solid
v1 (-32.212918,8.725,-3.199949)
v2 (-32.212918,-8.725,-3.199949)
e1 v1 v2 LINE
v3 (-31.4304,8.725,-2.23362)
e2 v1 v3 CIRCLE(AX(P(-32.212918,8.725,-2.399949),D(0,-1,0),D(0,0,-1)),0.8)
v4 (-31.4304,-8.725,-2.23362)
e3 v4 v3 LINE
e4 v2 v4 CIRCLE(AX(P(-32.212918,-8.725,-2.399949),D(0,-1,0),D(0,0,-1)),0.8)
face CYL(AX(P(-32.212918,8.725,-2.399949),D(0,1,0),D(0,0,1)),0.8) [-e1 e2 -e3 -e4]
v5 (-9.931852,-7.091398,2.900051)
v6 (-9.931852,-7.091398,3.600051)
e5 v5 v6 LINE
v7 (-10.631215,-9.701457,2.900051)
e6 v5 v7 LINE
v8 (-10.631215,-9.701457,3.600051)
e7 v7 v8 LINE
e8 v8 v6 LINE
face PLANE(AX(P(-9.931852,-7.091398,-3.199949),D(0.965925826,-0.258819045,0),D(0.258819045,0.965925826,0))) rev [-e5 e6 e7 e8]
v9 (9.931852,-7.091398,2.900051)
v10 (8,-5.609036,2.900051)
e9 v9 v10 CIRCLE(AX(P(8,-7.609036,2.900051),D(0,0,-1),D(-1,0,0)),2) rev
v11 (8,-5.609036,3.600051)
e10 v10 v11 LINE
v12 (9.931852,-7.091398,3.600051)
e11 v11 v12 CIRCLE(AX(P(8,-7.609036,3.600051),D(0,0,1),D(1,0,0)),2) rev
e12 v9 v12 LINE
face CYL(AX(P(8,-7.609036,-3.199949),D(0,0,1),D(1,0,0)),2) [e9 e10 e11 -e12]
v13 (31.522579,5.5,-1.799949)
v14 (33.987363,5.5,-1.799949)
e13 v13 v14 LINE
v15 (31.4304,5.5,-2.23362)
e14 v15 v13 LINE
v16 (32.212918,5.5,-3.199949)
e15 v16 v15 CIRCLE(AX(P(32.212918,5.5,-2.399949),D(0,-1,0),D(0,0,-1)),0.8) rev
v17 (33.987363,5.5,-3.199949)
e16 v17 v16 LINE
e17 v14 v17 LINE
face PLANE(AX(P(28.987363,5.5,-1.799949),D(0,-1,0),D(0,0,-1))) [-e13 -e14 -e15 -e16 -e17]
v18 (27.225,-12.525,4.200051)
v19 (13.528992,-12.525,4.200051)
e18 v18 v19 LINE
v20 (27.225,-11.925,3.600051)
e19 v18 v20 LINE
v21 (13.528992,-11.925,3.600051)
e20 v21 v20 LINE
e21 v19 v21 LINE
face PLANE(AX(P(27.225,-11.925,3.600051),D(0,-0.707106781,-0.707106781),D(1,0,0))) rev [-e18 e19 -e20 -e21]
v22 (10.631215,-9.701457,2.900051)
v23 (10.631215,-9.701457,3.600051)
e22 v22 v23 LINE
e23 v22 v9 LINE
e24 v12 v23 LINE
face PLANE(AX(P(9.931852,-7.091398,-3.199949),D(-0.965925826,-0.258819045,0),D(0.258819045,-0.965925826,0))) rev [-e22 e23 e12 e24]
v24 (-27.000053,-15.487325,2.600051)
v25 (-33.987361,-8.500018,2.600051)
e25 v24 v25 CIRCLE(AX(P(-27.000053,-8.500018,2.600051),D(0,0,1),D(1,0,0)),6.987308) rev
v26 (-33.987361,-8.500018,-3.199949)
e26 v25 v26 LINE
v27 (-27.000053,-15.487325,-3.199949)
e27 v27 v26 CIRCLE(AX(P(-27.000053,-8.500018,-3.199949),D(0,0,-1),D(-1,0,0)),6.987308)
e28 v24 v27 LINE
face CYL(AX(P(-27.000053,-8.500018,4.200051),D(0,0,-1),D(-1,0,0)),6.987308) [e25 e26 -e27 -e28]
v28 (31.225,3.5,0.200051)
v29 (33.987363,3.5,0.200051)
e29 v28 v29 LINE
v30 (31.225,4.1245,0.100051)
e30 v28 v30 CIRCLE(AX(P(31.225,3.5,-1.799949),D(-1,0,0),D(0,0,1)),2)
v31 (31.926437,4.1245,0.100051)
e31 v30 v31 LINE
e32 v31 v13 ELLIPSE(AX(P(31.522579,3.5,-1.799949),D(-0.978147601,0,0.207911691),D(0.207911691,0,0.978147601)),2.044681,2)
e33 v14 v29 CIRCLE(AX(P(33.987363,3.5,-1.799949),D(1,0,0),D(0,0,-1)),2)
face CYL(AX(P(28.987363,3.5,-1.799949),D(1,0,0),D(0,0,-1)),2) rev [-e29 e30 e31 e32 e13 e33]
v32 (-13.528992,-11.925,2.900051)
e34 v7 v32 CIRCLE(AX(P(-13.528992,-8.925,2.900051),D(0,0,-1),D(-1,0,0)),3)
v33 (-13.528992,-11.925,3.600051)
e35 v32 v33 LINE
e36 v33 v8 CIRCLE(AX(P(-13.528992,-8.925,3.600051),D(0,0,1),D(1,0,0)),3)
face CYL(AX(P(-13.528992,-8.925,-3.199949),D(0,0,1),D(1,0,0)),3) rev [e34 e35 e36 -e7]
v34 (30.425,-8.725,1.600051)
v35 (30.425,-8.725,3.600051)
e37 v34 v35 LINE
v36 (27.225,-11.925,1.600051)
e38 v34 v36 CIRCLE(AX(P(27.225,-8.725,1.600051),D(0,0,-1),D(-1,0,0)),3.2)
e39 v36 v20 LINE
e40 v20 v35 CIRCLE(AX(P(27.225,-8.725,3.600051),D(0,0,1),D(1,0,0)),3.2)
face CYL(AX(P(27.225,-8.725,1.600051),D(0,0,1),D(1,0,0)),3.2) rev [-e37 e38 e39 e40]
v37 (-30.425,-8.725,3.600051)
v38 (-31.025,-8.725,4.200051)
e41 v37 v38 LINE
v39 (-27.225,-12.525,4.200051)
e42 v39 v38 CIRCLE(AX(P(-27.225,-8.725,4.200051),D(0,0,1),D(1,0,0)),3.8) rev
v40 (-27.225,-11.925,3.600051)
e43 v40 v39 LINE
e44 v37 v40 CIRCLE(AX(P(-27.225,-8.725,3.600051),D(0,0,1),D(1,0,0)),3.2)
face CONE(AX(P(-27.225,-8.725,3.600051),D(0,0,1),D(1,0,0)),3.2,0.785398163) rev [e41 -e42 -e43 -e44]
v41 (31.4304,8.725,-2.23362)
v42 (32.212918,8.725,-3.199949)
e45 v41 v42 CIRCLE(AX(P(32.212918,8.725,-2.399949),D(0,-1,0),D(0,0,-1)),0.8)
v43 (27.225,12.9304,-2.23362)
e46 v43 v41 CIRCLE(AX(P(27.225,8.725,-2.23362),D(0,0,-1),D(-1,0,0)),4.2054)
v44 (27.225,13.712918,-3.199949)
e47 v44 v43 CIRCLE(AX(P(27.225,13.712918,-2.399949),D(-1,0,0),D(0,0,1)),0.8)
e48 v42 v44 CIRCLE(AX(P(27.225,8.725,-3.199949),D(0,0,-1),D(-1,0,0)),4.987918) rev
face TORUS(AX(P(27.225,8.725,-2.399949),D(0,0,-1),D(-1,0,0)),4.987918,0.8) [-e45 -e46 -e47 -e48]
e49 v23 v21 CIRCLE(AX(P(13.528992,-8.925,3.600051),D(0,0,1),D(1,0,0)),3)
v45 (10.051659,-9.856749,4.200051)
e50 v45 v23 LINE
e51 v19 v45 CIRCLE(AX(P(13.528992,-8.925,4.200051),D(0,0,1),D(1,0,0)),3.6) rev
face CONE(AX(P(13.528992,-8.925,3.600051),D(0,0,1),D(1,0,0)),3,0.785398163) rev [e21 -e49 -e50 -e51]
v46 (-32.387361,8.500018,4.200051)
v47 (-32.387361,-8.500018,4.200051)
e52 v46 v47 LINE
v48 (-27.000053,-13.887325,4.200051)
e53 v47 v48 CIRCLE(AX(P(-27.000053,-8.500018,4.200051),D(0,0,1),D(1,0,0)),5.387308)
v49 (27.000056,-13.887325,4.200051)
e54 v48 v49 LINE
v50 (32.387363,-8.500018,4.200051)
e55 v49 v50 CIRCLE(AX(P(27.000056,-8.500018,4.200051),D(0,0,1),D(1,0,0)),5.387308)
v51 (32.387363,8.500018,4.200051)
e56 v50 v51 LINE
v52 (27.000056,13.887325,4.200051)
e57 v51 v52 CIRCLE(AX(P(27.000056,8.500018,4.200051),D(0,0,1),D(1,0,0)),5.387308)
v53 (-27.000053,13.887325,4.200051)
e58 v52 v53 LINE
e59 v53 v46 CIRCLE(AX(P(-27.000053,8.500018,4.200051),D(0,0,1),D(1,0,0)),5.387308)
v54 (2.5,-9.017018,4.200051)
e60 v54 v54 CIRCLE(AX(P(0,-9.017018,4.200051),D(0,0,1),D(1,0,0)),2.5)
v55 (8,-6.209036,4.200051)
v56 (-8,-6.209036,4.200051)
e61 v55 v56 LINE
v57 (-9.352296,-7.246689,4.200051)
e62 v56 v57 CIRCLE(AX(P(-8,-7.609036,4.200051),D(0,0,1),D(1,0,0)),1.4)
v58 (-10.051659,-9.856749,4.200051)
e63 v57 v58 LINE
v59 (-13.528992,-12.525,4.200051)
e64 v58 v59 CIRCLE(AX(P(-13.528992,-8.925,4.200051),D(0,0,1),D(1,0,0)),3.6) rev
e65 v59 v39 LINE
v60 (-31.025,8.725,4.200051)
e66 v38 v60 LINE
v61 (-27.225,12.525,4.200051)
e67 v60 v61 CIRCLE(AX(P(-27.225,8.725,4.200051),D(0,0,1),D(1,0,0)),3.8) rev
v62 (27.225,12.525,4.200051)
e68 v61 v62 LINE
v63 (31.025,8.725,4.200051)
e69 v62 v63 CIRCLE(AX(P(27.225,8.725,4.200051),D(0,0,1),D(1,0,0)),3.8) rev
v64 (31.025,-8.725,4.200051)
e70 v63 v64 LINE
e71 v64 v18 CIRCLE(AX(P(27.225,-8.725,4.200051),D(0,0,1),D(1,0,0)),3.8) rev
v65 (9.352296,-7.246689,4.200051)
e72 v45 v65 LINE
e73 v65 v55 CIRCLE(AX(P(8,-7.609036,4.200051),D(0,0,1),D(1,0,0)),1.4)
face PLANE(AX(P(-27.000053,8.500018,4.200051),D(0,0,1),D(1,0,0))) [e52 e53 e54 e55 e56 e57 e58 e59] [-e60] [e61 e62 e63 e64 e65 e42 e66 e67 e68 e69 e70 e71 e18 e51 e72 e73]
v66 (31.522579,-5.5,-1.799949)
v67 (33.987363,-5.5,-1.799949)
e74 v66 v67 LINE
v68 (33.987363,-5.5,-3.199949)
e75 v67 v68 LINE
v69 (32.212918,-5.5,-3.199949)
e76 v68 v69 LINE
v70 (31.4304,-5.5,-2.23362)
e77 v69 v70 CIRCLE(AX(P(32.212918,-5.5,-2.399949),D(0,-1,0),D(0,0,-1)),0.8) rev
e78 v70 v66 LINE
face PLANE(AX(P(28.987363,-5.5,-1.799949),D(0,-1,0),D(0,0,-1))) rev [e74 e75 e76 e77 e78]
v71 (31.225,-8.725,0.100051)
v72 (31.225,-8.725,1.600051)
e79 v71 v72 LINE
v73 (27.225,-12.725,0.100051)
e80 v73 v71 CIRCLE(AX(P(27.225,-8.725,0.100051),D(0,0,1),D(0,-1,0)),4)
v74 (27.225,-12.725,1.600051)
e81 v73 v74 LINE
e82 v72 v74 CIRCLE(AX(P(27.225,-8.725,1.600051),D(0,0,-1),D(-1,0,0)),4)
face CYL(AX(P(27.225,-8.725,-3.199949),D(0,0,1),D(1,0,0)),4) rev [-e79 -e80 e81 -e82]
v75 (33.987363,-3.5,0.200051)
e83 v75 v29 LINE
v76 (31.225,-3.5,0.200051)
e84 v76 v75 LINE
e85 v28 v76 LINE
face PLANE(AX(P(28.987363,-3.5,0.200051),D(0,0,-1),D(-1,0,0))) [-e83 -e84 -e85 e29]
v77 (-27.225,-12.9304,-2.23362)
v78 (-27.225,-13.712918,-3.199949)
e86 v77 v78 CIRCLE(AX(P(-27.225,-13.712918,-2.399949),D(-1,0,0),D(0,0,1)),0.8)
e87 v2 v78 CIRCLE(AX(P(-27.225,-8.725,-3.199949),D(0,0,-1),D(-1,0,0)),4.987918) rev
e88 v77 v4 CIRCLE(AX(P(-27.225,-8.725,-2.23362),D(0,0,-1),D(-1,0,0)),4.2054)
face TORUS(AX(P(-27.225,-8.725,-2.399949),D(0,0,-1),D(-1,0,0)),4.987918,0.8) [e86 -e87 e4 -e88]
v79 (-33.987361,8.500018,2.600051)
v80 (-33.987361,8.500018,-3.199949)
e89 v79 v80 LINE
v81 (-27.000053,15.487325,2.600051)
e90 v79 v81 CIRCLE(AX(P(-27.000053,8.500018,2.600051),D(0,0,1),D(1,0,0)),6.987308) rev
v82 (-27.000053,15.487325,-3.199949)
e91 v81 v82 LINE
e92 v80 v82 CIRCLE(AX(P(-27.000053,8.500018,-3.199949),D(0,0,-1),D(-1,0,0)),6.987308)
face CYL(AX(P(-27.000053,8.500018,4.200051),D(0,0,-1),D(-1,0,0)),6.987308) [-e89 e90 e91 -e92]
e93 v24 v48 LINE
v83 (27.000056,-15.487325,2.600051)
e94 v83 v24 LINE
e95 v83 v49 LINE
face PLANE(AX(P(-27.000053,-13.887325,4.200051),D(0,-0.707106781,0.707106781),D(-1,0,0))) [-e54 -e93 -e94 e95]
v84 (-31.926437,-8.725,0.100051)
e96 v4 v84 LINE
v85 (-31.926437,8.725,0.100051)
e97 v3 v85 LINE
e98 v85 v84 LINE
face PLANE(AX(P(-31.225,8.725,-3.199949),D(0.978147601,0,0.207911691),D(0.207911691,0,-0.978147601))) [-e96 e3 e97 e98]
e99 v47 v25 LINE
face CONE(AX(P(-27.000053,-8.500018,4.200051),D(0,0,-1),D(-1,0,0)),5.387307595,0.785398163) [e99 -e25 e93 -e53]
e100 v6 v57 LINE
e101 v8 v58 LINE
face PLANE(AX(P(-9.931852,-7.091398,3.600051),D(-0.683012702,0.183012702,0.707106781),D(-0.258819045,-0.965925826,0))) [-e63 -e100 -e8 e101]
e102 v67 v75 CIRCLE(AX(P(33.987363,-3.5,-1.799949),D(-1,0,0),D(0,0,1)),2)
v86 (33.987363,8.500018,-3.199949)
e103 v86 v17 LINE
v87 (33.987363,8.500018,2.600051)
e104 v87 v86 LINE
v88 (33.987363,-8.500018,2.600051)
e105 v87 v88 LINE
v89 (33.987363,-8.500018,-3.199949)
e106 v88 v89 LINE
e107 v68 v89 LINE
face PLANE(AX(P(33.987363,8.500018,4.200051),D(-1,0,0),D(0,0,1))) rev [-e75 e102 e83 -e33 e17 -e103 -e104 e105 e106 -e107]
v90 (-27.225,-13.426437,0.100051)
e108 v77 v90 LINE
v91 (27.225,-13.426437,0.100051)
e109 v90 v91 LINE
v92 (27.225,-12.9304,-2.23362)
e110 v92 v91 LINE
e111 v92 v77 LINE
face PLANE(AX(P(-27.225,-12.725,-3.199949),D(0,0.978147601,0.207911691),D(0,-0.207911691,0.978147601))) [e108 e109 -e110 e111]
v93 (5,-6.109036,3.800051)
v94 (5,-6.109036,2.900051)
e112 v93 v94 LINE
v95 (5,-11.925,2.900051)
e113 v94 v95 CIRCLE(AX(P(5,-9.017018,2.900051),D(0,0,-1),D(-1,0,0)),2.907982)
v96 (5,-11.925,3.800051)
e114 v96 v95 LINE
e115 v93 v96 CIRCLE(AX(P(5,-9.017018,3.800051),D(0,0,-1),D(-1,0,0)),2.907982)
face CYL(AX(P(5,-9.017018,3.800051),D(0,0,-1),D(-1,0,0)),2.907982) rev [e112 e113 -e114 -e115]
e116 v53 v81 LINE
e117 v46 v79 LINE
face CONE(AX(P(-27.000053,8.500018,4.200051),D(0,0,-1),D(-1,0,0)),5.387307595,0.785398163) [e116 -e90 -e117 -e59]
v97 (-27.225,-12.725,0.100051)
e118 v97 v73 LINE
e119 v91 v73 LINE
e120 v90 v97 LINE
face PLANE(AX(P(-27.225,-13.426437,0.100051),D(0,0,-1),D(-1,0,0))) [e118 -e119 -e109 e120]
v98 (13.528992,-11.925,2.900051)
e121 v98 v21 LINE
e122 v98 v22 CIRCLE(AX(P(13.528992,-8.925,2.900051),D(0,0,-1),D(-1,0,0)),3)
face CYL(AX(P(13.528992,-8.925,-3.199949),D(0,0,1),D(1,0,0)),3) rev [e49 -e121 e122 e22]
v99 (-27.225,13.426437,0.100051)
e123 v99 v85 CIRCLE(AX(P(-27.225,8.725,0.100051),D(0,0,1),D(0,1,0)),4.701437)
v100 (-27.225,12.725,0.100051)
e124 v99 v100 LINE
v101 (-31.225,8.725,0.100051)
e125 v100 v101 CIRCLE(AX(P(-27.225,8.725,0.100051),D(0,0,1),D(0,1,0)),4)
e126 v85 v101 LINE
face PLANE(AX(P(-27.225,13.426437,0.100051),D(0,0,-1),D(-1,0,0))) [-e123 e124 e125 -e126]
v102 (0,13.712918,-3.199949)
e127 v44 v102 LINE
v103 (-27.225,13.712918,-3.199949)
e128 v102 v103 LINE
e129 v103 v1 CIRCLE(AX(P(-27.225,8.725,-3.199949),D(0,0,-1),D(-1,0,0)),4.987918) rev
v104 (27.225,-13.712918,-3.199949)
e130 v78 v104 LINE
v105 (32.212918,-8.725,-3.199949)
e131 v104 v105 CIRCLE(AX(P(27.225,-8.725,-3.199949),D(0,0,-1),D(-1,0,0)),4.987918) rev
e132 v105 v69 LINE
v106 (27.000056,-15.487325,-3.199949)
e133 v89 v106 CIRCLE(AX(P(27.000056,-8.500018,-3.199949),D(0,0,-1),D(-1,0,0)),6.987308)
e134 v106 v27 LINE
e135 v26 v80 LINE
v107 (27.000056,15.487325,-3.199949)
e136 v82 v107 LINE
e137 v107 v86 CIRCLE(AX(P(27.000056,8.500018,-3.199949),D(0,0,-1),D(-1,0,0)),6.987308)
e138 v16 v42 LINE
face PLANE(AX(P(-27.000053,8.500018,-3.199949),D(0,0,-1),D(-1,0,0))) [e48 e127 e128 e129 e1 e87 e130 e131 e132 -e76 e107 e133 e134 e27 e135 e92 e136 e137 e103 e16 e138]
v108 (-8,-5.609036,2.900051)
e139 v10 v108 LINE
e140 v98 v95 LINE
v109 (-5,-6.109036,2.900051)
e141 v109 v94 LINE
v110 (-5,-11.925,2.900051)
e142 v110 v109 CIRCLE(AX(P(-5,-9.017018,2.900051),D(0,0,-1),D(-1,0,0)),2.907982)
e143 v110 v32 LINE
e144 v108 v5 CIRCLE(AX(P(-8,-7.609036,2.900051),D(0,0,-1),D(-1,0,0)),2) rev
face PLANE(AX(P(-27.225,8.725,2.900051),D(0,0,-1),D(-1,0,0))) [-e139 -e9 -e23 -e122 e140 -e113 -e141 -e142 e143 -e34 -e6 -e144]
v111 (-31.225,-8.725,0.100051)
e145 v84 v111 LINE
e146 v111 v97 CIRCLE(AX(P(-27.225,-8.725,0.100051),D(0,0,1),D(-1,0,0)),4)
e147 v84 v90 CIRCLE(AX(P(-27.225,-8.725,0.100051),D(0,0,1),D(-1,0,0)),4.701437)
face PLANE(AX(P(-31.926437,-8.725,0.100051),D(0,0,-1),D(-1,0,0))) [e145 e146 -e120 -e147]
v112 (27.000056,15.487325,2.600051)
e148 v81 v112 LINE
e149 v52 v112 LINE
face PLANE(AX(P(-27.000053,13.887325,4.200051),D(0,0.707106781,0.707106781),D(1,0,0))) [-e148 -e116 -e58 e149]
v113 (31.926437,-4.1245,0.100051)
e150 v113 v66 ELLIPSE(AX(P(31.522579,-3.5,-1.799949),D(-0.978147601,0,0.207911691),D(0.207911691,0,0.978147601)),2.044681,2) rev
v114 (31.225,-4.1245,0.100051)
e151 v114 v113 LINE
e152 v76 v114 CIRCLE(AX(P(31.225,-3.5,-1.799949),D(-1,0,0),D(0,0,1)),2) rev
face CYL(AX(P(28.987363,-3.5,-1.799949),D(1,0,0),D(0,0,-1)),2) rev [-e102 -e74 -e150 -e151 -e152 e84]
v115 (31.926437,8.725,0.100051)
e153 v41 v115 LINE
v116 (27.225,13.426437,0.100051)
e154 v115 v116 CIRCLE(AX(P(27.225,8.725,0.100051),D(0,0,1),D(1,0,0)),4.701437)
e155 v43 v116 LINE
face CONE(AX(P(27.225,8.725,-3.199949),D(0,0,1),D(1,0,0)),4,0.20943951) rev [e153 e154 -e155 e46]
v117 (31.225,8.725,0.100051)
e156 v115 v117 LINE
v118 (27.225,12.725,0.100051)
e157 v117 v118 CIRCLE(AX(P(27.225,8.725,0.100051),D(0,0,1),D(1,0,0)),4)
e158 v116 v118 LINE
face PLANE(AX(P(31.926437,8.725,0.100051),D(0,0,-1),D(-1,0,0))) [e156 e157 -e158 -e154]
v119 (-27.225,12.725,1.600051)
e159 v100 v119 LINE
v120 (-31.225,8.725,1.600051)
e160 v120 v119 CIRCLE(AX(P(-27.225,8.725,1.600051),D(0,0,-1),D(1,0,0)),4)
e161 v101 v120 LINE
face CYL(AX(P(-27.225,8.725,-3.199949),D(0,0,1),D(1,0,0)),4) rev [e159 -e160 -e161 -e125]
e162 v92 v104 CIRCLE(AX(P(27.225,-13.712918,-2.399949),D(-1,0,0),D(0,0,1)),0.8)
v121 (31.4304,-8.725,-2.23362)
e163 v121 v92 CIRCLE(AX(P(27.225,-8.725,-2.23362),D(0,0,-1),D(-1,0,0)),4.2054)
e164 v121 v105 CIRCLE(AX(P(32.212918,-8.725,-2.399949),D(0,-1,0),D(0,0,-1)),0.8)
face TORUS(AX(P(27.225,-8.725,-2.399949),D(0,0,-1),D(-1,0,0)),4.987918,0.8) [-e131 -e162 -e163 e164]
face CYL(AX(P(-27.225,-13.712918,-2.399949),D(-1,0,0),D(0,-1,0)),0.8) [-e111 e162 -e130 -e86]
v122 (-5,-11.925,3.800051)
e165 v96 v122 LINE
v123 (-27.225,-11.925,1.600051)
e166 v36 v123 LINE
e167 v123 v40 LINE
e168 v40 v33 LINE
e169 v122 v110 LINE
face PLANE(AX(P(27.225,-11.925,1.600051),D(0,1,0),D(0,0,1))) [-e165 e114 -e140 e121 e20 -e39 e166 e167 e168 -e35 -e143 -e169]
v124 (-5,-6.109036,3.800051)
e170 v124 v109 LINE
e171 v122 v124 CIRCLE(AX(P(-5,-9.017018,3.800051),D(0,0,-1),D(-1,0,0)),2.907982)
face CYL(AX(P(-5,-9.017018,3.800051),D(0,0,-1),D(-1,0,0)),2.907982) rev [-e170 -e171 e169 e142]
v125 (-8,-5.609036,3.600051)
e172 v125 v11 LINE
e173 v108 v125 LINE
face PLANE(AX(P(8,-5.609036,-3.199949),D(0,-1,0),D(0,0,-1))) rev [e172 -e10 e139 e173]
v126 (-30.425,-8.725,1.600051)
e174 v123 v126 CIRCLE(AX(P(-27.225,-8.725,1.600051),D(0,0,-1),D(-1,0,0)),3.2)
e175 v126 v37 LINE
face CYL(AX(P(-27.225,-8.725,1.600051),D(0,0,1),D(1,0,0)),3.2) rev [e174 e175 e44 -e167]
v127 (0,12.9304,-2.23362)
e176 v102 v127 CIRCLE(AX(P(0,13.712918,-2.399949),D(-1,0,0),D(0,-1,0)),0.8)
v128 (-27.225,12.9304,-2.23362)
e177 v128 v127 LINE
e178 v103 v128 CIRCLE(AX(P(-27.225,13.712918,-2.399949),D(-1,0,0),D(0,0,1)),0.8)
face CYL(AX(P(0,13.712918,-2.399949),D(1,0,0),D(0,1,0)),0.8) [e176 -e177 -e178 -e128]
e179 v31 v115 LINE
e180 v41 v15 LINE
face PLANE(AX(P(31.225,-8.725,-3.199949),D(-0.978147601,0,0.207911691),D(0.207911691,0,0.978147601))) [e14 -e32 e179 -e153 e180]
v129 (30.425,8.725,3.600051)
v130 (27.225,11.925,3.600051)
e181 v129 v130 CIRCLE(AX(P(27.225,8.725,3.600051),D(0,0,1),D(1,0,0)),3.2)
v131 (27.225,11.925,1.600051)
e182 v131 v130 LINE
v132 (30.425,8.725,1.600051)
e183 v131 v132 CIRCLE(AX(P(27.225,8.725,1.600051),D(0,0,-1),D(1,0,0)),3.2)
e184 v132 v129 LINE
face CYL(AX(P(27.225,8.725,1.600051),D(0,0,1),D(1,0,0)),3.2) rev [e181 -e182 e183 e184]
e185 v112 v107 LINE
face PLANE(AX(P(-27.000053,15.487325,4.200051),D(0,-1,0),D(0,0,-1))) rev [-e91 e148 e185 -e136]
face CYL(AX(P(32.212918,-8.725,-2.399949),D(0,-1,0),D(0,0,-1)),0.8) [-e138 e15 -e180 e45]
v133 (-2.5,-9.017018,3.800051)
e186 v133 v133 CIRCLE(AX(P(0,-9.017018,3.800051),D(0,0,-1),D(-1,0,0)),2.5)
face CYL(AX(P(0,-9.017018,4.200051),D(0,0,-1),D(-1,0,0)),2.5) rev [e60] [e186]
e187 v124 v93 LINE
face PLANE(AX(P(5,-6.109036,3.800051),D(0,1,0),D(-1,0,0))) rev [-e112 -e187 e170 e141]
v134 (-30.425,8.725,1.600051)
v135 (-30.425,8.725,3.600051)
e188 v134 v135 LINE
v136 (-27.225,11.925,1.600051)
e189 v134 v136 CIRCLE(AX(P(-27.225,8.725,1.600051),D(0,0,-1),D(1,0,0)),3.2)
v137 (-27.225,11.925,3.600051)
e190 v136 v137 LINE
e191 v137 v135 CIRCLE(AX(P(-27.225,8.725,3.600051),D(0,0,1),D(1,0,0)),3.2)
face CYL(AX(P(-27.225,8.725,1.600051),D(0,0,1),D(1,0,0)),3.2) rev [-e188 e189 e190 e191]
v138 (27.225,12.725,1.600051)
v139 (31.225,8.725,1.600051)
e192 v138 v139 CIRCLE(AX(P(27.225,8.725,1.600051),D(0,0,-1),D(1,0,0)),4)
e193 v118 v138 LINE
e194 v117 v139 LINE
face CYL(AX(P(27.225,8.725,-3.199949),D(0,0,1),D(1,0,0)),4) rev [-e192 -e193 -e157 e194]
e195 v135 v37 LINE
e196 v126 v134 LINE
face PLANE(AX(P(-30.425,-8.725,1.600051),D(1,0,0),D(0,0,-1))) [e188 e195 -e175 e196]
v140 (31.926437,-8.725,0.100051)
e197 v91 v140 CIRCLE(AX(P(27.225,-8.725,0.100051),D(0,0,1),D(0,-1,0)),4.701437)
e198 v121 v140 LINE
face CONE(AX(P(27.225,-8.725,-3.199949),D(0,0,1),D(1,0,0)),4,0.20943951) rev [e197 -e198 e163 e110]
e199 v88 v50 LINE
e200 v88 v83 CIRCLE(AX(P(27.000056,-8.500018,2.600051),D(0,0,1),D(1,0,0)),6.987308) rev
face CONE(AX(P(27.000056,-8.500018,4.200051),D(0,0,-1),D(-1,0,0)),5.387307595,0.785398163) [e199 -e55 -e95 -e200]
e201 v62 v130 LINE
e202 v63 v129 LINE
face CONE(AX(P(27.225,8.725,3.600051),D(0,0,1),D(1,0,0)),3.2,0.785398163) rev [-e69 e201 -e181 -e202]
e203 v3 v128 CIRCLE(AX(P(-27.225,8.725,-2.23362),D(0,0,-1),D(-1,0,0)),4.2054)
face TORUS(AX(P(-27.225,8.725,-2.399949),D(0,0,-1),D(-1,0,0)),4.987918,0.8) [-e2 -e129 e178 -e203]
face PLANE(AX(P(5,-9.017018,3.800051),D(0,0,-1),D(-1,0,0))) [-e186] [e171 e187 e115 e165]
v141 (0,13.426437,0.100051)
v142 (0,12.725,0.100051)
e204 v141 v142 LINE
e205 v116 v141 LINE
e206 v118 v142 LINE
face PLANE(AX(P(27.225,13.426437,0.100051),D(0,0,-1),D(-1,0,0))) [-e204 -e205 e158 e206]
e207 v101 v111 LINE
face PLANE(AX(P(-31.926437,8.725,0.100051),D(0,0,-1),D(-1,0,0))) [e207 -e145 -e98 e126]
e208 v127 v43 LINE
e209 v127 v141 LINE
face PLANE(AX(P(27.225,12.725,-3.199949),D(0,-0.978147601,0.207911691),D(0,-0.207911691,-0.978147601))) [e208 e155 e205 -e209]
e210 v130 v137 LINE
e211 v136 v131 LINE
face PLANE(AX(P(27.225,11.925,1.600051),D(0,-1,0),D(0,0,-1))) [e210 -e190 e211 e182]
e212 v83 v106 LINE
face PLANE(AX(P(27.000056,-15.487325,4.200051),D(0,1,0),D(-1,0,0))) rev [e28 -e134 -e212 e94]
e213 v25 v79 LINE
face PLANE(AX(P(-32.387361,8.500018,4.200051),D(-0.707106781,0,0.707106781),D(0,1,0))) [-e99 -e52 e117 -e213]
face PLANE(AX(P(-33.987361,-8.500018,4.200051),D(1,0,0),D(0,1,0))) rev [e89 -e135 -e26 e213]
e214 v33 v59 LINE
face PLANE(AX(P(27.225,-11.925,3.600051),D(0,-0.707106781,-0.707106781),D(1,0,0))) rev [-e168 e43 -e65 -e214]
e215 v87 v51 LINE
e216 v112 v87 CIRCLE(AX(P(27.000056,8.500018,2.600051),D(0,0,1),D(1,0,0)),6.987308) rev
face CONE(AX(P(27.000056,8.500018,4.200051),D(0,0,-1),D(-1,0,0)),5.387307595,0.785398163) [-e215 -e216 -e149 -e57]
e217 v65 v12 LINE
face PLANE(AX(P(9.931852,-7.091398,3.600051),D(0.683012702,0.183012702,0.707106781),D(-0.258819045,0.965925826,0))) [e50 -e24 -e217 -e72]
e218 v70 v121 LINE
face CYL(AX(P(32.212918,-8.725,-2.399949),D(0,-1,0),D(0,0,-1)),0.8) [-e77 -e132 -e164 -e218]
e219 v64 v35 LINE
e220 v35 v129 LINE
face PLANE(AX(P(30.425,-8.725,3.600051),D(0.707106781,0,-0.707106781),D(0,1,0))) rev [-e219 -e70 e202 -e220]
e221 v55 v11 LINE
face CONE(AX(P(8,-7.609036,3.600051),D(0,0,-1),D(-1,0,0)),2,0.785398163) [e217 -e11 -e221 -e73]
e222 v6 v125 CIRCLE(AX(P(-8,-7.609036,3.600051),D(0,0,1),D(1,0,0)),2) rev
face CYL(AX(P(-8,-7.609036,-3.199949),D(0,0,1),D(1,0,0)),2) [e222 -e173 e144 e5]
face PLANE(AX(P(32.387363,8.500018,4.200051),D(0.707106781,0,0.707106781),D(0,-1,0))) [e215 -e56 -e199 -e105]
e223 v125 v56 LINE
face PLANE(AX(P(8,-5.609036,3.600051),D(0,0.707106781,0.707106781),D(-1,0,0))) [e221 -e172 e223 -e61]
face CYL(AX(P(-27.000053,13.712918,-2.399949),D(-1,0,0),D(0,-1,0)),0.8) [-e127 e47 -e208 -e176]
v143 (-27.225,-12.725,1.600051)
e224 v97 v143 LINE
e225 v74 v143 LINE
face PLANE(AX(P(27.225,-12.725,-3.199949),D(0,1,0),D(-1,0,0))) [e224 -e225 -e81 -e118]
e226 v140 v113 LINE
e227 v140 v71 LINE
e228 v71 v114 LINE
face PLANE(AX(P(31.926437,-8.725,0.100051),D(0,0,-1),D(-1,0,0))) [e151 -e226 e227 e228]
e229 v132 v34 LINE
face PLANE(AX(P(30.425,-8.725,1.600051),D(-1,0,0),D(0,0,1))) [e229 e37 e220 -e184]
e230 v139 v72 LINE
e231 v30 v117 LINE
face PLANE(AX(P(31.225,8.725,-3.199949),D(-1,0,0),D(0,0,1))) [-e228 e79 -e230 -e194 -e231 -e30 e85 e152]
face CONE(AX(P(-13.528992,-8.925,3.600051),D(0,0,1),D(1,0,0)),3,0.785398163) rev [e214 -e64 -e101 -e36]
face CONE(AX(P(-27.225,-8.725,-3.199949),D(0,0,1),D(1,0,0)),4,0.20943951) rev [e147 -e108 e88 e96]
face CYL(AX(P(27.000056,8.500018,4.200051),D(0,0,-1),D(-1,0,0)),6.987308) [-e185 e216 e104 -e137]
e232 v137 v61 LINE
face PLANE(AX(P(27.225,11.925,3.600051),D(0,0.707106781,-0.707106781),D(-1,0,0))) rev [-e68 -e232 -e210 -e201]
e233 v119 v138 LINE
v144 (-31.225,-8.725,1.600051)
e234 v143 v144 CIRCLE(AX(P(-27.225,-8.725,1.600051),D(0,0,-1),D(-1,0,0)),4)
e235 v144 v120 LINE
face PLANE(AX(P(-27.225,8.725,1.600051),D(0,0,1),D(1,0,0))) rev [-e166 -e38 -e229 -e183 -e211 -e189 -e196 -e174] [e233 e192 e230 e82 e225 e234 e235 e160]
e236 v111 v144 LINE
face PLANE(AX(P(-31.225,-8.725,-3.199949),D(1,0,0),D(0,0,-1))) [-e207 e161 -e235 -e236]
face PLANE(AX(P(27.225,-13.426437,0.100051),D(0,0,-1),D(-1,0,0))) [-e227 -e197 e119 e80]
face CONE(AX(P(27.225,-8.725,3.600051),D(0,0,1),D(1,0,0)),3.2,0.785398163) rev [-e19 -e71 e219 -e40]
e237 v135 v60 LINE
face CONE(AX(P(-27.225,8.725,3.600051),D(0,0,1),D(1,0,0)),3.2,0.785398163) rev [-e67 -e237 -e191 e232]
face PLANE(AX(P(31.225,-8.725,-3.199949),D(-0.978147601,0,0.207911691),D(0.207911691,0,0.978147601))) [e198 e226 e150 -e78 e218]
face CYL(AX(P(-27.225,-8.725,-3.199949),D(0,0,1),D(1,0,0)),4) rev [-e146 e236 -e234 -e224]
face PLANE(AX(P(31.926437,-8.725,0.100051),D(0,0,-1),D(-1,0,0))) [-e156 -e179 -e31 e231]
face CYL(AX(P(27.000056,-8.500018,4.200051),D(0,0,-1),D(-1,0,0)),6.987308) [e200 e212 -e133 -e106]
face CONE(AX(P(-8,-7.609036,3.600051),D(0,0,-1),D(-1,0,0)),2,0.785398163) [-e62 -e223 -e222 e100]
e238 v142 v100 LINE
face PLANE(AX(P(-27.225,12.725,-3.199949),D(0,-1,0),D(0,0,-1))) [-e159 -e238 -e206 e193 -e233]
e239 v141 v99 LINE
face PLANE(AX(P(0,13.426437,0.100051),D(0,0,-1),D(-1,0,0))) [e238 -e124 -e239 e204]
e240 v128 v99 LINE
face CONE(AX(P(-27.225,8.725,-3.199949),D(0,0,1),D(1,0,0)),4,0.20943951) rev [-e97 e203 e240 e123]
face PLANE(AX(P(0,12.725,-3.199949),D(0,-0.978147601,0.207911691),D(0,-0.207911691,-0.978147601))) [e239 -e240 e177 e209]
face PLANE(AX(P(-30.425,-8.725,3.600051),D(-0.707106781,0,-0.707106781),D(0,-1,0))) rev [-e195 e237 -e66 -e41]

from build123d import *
from build123d.topology import SkipClean

# Parameters (mm, degrees)
SKIZZE1_W                         = 7.626009652
SKIZZE1_H                         = 10.039014478
AUFSATZ_LINEAR_AUSTRAGEN1_DEPTH   = 1.5
AUFSATZ_LINEAR_AUSTRAGEN1_2_DEPTH = 1.5
AUFSATZ_LINEAR_AUSTRAGEN1_3_DEPTH = 1.5
AUFSATZ_LINEAR_AUSTRAGEN1_4_DEPTH = 1.5
AUFSATZ_LINEAR_AUSTRAGEN1_5_DEPTH = 1.5
SKIZZE2_R                         = 2.5
AUFSATZ_LINEAR_AUSTRAGEN2_DEPTH   = 0.4
AUFSATZ_LINEAR_AUSTRAGEN3_DEPTH   = 2.2
AUFSATZ_LINEAR_AUSTRAGEN14_DEPTH  = 7
SKIZZE14_R                        = 2.5
SKIZZE14_W                        = 7.626009652
SKIZZE14_H                        = 10.039014478
AUFSATZ_LINEAR_AUSTRAGEN15_DEPTH  = 0.9
VERRUNDUNG1_R                     = 0.8
SCHNITT_LINEAR_AUSTRAGEN1_DEPTH   = 5
SCHNITT_LINEAR_AUSTRAGEN2_DEPTH   = 0.9
FASE1_SIZE                        = 1.6
SCHNITT_LINEAR_AUSTRAGEN4_DEPTH   = 39.075689459
FASE2_SIZE                        = 0.6


with BuildPart() as part:
    # Skizze1 → Aufsatz-Linear austragen1 (new body)
    with BuildSketch(Plane.XY.offset(2.3000508)):
        with Locations((-8.282016764, -0.163000133)):
            Rectangle(SKIZZE1_W, SKIZZE1_H)
        Polygon((-11.69502159, 4.456507106), (-5.069011938, 4.456507106), (-5.069011938, -4.582507372), (-9.09502159, -4.582507372), (-11.69502159, -4.124057223), (-11.69502159, 0.203832093), (-9.09502159, 0.900499994), (-7.35501651, 0.900499994), (-7.35501651, -0.899500006), (-9.89502159, -0.899500006), (-9.89502159, -2.782507372), (-6.869011938, -2.782507372), (-6.869011938, 2.656507106), (-11.69502159, 2.656507106), align=None, mode=Mode.SUBTRACT)
    extrude(amount=AUFSATZ_LINEAR_AUSTRAGEN1_DEPTH)



with BuildPart() as body_2:
    # Skizze1 → Aufsatz-Linear austragen1 2 (new body)
    with BuildSketch(Plane.XY.offset(2.3000508)):
        Polygon((-15.915075673, 4.956507106), (-28.451054102, 4.956507106), (-28.451054102, -5.082507372), (-25.651054102, -5.082507372), (-25.651054102, 2.156507106), (-22.99004318, 2.156507106), (-22.99004318, -5.082507372), (-20.19004318, -5.082507372), (-20.19004318, 2.156507106), (-17.91003302, 2.156507106), (-17.91003302, -5.082507372), (-15.11003302, -5.082507372), (-15.11003302, 2.744670596), align=None)
        Polygon((-27.951054102, -4.582507372), (-26.151054102, -4.582507372), (-26.151054102, 2.656507106), (-22.49004318, 2.656507106), (-22.49004318, -4.582507372), (-20.69004318, -4.582507372), (-20.69004318, 2.656507106), (-17.41003302, 2.656507106), (-17.41003302, -4.582507372), (-15.61003302, -4.582507372), (-15.61003302, 2.656507106), (-16.265179442, 4.456507106), (-27.951054102, 4.456507106), align=None, mode=Mode.SUBTRACT)
    extrude(amount=AUFSATZ_LINEAR_AUSTRAGEN1_2_DEPTH)


with BuildPart() as body_3:
    # Skizze1 → Aufsatz-Linear austragen1 3 (new body)
    with BuildSketch(Plane.XY.offset(2.3000508)):
        Polygon((5.972009144, 4.956507106), (3.559004318, 4.956507106), (3.559004318, 8.89351498), (0.759004318, 8.89351498), (0.759004318, 4.956507106), (-1.654000508, 4.956507106), (-1.654000508, 2.156507106), (0.759004318, 2.156507106), (0.759004318, -5.082507372), (5.972009144, -5.082507372), (5.972009144, -2.282507372), (3.559004318, -2.282507372), (3.559004318, 2.156507106), (5.972009144, 2.156507106), align=None)
        Polygon((1.259004318, 8.39351498), (1.259004318, 4.456507106), (-1.154000508, 4.456507106), (-1.154000508, 2.656507106), (1.259004318, 2.656507106), (1.259004318, -4.582507372), (5.472009144, -4.582507372), (5.472009144, -2.782507372), (3.059004318, -2.782507372), (3.059004318, 2.656507106), (5.472009144, 2.656507106), (5.472009144, 4.456507106), (3.059004318, 4.456507106), (3.059004318, 8.39351498), align=None, mode=Mode.SUBTRACT)
    extrude(amount=AUFSATZ_LINEAR_AUSTRAGEN1_3_DEPTH)


with BuildPart() as body_4:
    # Skizze1 → Aufsatz-Linear austragen1 4 (new body)
    with BuildSketch(Plane.XY.offset(2.3000508)):
        Polygon((10.972977453, 4.956507106), (16.513030226, 4.956507106), (16.513030226, 2.156507106), (12.264129895, 2.156507106), (11.687020574, 1.579397784), (11.687020574, -1.705398051), (12.264129895, -2.282507372), (16.513030226, -2.282507372), (16.513030226, -5.082507372), (10.972977453, -5.082507372), (8.887020574, -3.332181725), (8.887020574, 3.206181458), align=None)
        Polygon((16.013030226, 2.656507106), (12.057023114, 2.656507106), (11.187020574, 1.786504566), (11.187020574, -1.912504832), (12.057023114, -2.782507372), (16.013030226, -2.782507372), (16.013030226, -4.582507372), (11.15496257, -4.582507372), (9.387020574, -3.099027896), (9.387020574, 2.973027629), (11.15496257, 4.456507106), (16.013030226, 4.456507106), align=None, mode=Mode.SUBTRACT)
    extrude(amount=AUFSATZ_LINEAR_AUSTRAGEN1_4_DEPTH)


with BuildPart() as body_5:
    # Skizze1 → Aufsatz-Linear austragen1 5 (new body)
    with BuildSketch(Plane.XY.offset(2.3000508)):
        Polygon((27.321990188, 4.856507106), (22.128041656, 4.856507106), (22.128041656, 8.666514726), (19.528041656, 8.666514726), (19.528041656, -4.982507372), (22.128041656, -4.982507372), (22.128041656, 2.256507106), (25.497053594, 2.256507106), (25.497053594, -4.982507372), (28.097053594, -4.982507372), (28.097053594, 2.727037898), align=None)
        Polygon((19.928041656, 8.266514726), (19.928041656, -4.582507372), (21.728041656, -4.582507372), (21.728041656, 2.656507106), (25.897053594, 2.656507106), (25.897053594, -4.582507372), (27.697053594, -4.582507372), (27.697053594, 2.656507106), (27.041907172, 4.456507106), (21.728041656, 4.456507106), (21.728041656, 8.266514726), align=None, mode=Mode.SUBTRACT)
    extrude(amount=AUFSATZ_LINEAR_AUSTRAGEN1_5_DEPTH)


with BuildPart() as part_1:
    add(part.part)

    add(body_2.part)  # Aufsatz-Linear austragen2 merges body 2

    add(body_3.part)  # Aufsatz-Linear austragen2 merges body 3

    add(body_4.part)  # Aufsatz-Linear austragen2 merges body 4

    add(body_5.part)  # Aufsatz-Linear austragen2 merges body 5
    # Skizze2 → Aufsatz-Linear austragen2 (add)
    with BuildSketch(Plane.XY.offset(3.8000508)):
        with BuildLine():
            Line((-27.00005334, 15.487325375), (27.00005588, 15.487325375))
            ThreePointArc((27.00005588, 15.487325375), (31.940828463, 13.440790362), (33.987363475, 8.50001778))
            Line((33.987363475, 8.50001778), (33.987363475, -8.50001778))
            ThreePointArc((33.987363475, -8.50001778), (31.940828463, -13.440790362), (27.00005588, -15.487325375))
            Line((27.00005588, -15.487325375), (-27.00005334, -15.487325375))
            ThreePointArc((-27.00005334, -15.487325375), (-31.940825922, -13.440790362), (-33.987360935, -8.50001778))
            Line((-33.987360935, -8.50001778), (-33.987360935, 8.50001778))
            ThreePointArc((-33.987360935, 8.50001778), (-31.940825922, 13.440790362), (-27.00005334, 15.487325375))
        make_face()
        with Locations((0, -9.017018034)):
            Circle(SKIZZE2_R, mode=Mode.SUBTRACT)
    extrude(amount=AUFSATZ_LINEAR_AUSTRAGEN2_DEPTH)

    # Skizze3 → Aufsatz-Linear austragen3 (add)
    with BuildSketch(Plane(origin=(0, 0, 3.8000508), x_dir=(-1, 0, 0), z_dir=(0, 0, -1))):
        with BuildLine():
            Line((-27.225, -12.725), (27.225, -12.725))
            ThreePointArc((27.225, -12.725), (30.053427125, -11.553427125), (31.225, -8.725))
            Line((31.225, -8.725), (31.225, 8.725))
            ThreePointArc((31.225, 8.725), (30.053427125, 11.553427125), (27.225, 12.725))
            Line((27.225, 12.725), (-27.225, 12.725))
            ThreePointArc((-27.225, 12.725), (-30.053427125, 11.553427125), (-31.225, 8.725))
            Line((-31.225, 8.725), (-31.225, -8.725))
            ThreePointArc((-31.225, -8.725), (-30.053427125, -11.553427125), (-27.225, -12.725))
        make_face()
        with BuildLine():
            Line((-27.225, 11.925), (27.225, 11.925))
            ThreePointArc((27.225, 11.925), (29.4877417, 10.9877417), (30.425, 8.725))
            Line((30.425, 8.725), (30.425, -8.725))
            ThreePointArc((30.425, -8.725), (29.4877417, -10.9877417), (27.225, -11.925))
            Line((27.225, -11.925), (-27.225, -11.925))
            ThreePointArc((-27.225, -11.925), (-29.4877417, -10.9877417), (-30.425, -8.725))
            Line((-30.425, -8.725), (-30.425, 8.725))
            ThreePointArc((-30.425, 8.725), (-29.4877417, 10.9877417), (-27.225, 11.925))
        make_face(mode=Mode.SUBTRACT)
    extrude(amount=AUFSATZ_LINEAR_AUSTRAGEN3_DEPTH)

    # Skizze10 → Aufsatz-Linear austragen14 (add)
    with BuildSketch(Plane(origin=(0, 0, 3.8000508), x_dir=(-1, 0, 0), z_dir=(0, 0, -1))):
        with BuildLine():
            Line((27.00005334, 15.487325375), (-27.00005588, 15.487325375))
            ThreePointArc((-27.00005588, 15.487325375), (-31.940828463, 13.440790362), (-33.987363475, 8.50001778))
            Line((-33.987363475, 8.50001778), (-33.987363475, -8.50001778))
            ThreePointArc((-33.987363475, -8.50001778), (-31.940828463, -13.440790362), (-27.00005588, -15.487325375))
            Line((-27.00005588, -15.487325375), (27.00005334, -15.487325375))
            ThreePointArc((27.00005334, -15.487325375), (31.940825922, -13.440790362), (33.987360935, -8.50001778))
            Line((33.987360935, -8.50001778), (33.987360935, 8.50001778))
            ThreePointArc((33.987360935, 8.50001778), (31.940825922, 13.440790362), (27.00005334, 15.487325375))
        make_face()
        with BuildLine():
            Line((31.225, -8.725), (31.225, 8.725))
            ThreePointArc((31.225, 8.725), (30.053427125, 11.553427125), (27.225, 12.725))
            Line((27.225, 12.725), (-27.225, 12.725))
            ThreePointArc((-27.225, 12.725), (-30.053427125, 11.553427125), (-31.225, 8.725))
            Line((-31.225, 8.725), (-31.225, -8.725))
            ThreePointArc((-31.225, -8.725), (-30.053427125, -11.553427125), (-27.225, -12.725))
            Line((-27.225, -12.725), (27.225, -12.725))
            ThreePointArc((27.225, -12.725), (30.053427125, -11.553427125), (31.225, -8.725))
        make_face(mode=Mode.SUBTRACT)
    extrude(amount=AUFSATZ_LINEAR_AUSTRAGEN14_DEPTH)

    # Skizze14 → Aufsatz-Linear austragen15 (add)
    with BuildSketch(Plane(origin=(0, 0, 3.8000508), x_dir=(-1, 0, 0), z_dir=(0, 0, -1))):
        with BuildLine():
            Line((27.225, 11.925), (-27.225, 11.925))
            ThreePointArc((-27.225, 11.925), (-29.4877417, 10.9877417), (-30.425, 8.725))
            Line((-30.425, 8.725), (-30.425, -8.725))
            ThreePointArc((-30.425, -8.725), (-29.4877417, -10.9877417), (-27.225, -11.925))
            Line((-27.225, -11.925), (27.225, -11.925))
            ThreePointArc((27.225, -11.925), (29.4877417, -10.9877417), (30.425, -8.725))
            Line((30.425, -8.725), (30.425, 8.725))
            ThreePointArc((30.425, 8.725), (29.4877417, 10.9877417), (27.225, 11.925))
        make_face()
        with Locations((0, -9.017018034)):
            Circle(SKIZZE14_R, mode=Mode.SUBTRACT)
        with Locations((8.282016764, -0.163000133)):
            Rectangle(SKIZZE14_W, SKIZZE14_H, mode=Mode.SUBTRACT)
        Polygon((15.915075673, 4.956507106), (15.11003302, 2.744670596), (15.11003302, -5.082507372), (17.91003302, -5.082507372), (17.91003302, 2.156507106), (20.19004318, 2.156507106), (20.19004318, -5.082507372), (22.99004318, -5.082507372), (22.99004318, 2.156507106), (25.651054102, 2.156507106), (25.651054102, -5.082507372), (28.451054102, -5.082507372), (28.451054102, 4.956507106), align=None, mode=Mode.SUBTRACT)
        Polygon((-5.972009144, 4.956507106), (-5.972009144, 2.156507106), (-3.559004318, 2.156507106), (-3.559004318, -2.282507372), (-5.972009144, -2.282507372), (-5.972009144, -5.082507372), (-0.759004318, -5.082507372), (-0.759004318, 2.156507106), (1.654000508, 2.156507106), (1.654000508, 4.956507106), (-0.759004318, 4.956507106), (-0.759004318, 8.89351498), (-3.559004318, 8.89351498), (-3.559004318, 4.956507106), align=None, mode=Mode.SUBTRACT)
        Polygon((-8.887020574, 3.206181458), (-10.972977453, 4.956507106), (-16.513030226, 4.956507106), (-16.513030226, 2.156507106), (-12.264129895, 2.156507106), (-11.687020574, 1.579397784), (-11.687020574, -1.705398051), (-12.264129895, -2.282507372), (-16.513030226, -2.282507372), (-16.513030226, -5.082507372), (-10.972977453, -5.082507372), (-8.887020574, -3.332181725), align=None, mode=Mode.SUBTRACT)
        Polygon((-27.321990188, 4.856507106), (-28.097053594, 2.727037898), (-28.097053594, -4.982507372), (-25.497053594, -4.982507372), (-25.497053594, 2.256507106), (-22.128041656, 2.256507106), (-22.128041656, -4.982507372), (-19.528041656, -4.982507372), (-19.528041656, 8.666514726), (-22.128041656, 8.666514726), (-22.128041656, 4.856507106), align=None, mode=Mode.SUBTRACT)
    extrude(amount=AUFSATZ_LINEAR_AUSTRAGEN15_DEPTH)

    # Schnitt-Austragung1: sweep along a path in Skizze12
    with BuildLine(Plane(origin=(0, 0, -3.1999492), x_dir=(-1, 0, 0), z_dir=(0, 0, -1))) as schnitt_austragung1_path:
        Line((31.225, -8.725), (31.225, 8.725))
        ThreePointArc((31.225, 8.725), (30.053427125, 11.553427125), (27.225, 12.725))
        Line((27.225, 12.725), (-27.225, 12.725))
        ThreePointArc((-27.225, 12.725), (-30.053427125, 11.553427125), (-31.225, 8.725))
        Line((-31.225, 8.725), (-31.225, -8.725))
        ThreePointArc((-31.225, -8.725), (-30.053427125, -11.553427125), (-27.225, -12.725))
        Line((-27.225, -12.725), (27.225, -12.725))
        ThreePointArc((27.225, -12.725), (30.053427125, -11.553427125), (31.225, -8.725))
    # Skizze11 → Schnitt-Austragung1 (sweep, cut)
    with BuildSketch(Plane(origin=(0, 0, 0), x_dir=(0, 0, -1), z_dir=(1, 0, 0))):
        Polygon((3.1999492, 12.725), (-0.1000508, 12.725), (-0.1000508, 13.426436654), align=None)
    sweep(path=schnitt_austragung1_path.line, mode=Mode.SUBTRACT)

    # Verrundung1
    verrundung1_edges = [part_1.edges().sort_by_distance(p)[0] for p in [
        (0, 12.725, -3.1999492),
        (30.053427125, 11.553427125, -3.1999492),
        (31.225, 0, -3.1999492),
        (30.053427125, -11.553427125, -3.1999492),
        (-31.225, 0, -3.1999492),
        (0, -12.725, -3.1999492),
        (-30.053427125, -11.553427125, -3.1999492),
        (-30.053427125, 11.553427125, -3.1999492),
        (0, 12.725, -3.1999492),
    ]]
    fillet(verrundung1_edges, radius=VERRUNDUNG1_R)

    # Skizze13 → Schnitt-Linear austragen1 (cut)
    with BuildSketch(Plane(origin=(33.987363475, 0, 0), x_dir=(0, 0, -1), z_dir=(1, 0, 0))):
        with BuildLine():
            Line((1.7999492, -5.5), (3.9999492, -5.5))
            ThreePointArc((3.9999492, -5.5), (5.414162762, -4.914213562), (5.9999492, -3.5))
            Line((5.9999492, -3.5), (5.9999492, 3.5))
            ThreePointArc((5.9999492, 3.5), (5.414162762, 4.914213562), (3.9999492, 5.5))
            Line((3.9999492, 5.5), (1.7999492, 5.5))
            ThreePointArc((1.7999492, 5.5), (0.385735638, 4.914213562), (-0.2000508, 3.5))
            Line((-0.2000508, 3.5), (-0.2000508, -3.5))
            ThreePointArc((-0.2000508, -3.5), (0.385735638, -4.914213562), (1.7999492, -5.5))
        make_face()
    extrude(amount=-SCHNITT_LINEAR_AUSTRAGEN1_DEPTH, mode=Mode.SUBTRACT)

    # Skizze15 → Schnitt-Linear austragen2 (cut)
    with SkipClean():  # the faces are left unmerged after this step: merging them gives an invalid solid
        with BuildSketch(Plane(origin=(0, 0, 2.9000508), x_dir=(-1, 0, 0), z_dir=(0, 0, -1))):
            with BuildLine():
                Line((-5, -6.109036068), (5, -6.109036068))
                ThreePointArc((5, -6.109036068), (7.907981966, -9.017018034), (5, -11.925))
                Line((5, -11.925), (-5, -11.925))
                ThreePointArc((-5, -11.925), (-7.907981966, -9.017018034), (-5, -6.109036068))
            make_face()
        extrude(amount=-SCHNITT_LINEAR_AUSTRAGEN2_DEPTH, mode=Mode.SUBTRACT)

    # Fase1
    fase1_edges = [part_1.edges().sort_by_distance(p)[0] for p in [
        (-31.940825922, 13.440790362, 4.2000508),
        (-33.987360935, 0, 4.2000508),
        (-31.940825922, -13.440790362, 4.2000508),
        (1.27e-06, -15.487325375, 4.2000508),
        (31.940828463, -13.440790362, 4.2000508),
        (33.987363475, 0, 4.2000508),
        (31.940828463, 13.440790362, 4.2000508),
        (1.27e-06, 15.487325375, 4.2000508),
    ]]
    chamfer(fase1_edges, length=FASE1_SIZE)

    # Skizze18 → Schnitt-Linear austragen4 (cut, through all)
    with SkipClean():  # the faces are left unmerged after this step: merging them gives an invalid solid
        with BuildSketch(Plane.XY.offset(4.2000508)):
            with BuildLine():
                Line((-27.225, 11.925), (27.225, 11.925))
                ThreePointArc((27.225, 11.925), (29.4877417, 10.9877417), (30.425, 8.725))
                Line((30.425, 8.725), (30.425, -8.725))
                ThreePointArc((30.425, -8.725), (29.4877417, -10.9877417), (27.225, -11.925))
                Line((27.225, -11.925), (13.528992375, -11.925))
                ThreePointArc((13.528992375, -11.925), (11.702708088, -11.305060021), (10.631214896, -9.701457135))
                Line((10.631214896, -9.701457135), (9.931851653, -7.091397978))
                ThreePointArc((9.931851653, -7.091397978), (9.217522858, -6.022329387), (8, -5.609036068))
                Line((8, -5.609036068), (-8, -5.609036068))
                ThreePointArc((-8, -5.609036068), (-9.217522858, -6.022329387), (-9.931851653, -7.091397978))
                Line((-9.931851653, -7.091397978), (-10.631214896, -9.701457135))
                ThreePointArc((-10.631214896, -9.701457135), (-11.702708088, -11.305060021), (-13.528992375, -11.925))
                Line((-13.528992375, -11.925), (-27.225, -11.925))
                ThreePointArc((-27.225, -11.925), (-29.4877417, -10.9877417), (-30.425, -8.725))
                Line((-30.425, -8.725), (-30.425, 8.725))
                ThreePointArc((-30.425, 8.725), (-29.4877417, 10.9877417), (-27.225, 11.925))
            make_face()
        extrude(amount=-SCHNITT_LINEAR_AUSTRAGEN4_DEPTH, mode=Mode.SUBTRACT)
    add(part_1.part.scale(1), mode=Mode.REPLACE)  # the faces are merged on a copy

    # Fase2
    fase2_edges = [part_1.edges().sort_by_distance(p)[0] for p in [
        (-29.4877417, 10.9877417, 4.2000508),
        (-30.425, 0, 4.2000508),
        (-29.4877417, -10.9877417, 4.2000508),
        (-20.376996187, -11.925, 4.2000508),
        (-11.702708088, -11.305060021, 4.2000508),
        (-10.281533274, -8.396427557, 4.2000508),
        (-9.217522858, -6.022329387, 4.2000508),
        (0, -5.609036068, 4.2000508),
        (9.217522858, -6.022329387, 4.2000508),
        (10.281533274, -8.396427557, 4.2000508),
        (11.702708088, -11.305060021, 4.2000508),
        (20.376996187, -11.925, 4.2000508),
        (29.4877417, -10.9877417, 4.2000508),
        (30.425, 0, 4.2000508),
        (29.4877417, 10.9877417, 4.2000508),
        (0, 11.925, 4.2000508),
    ]]
    chamfer(fase2_edges, length=FASE2_SIZE)


solid = part_1.part
